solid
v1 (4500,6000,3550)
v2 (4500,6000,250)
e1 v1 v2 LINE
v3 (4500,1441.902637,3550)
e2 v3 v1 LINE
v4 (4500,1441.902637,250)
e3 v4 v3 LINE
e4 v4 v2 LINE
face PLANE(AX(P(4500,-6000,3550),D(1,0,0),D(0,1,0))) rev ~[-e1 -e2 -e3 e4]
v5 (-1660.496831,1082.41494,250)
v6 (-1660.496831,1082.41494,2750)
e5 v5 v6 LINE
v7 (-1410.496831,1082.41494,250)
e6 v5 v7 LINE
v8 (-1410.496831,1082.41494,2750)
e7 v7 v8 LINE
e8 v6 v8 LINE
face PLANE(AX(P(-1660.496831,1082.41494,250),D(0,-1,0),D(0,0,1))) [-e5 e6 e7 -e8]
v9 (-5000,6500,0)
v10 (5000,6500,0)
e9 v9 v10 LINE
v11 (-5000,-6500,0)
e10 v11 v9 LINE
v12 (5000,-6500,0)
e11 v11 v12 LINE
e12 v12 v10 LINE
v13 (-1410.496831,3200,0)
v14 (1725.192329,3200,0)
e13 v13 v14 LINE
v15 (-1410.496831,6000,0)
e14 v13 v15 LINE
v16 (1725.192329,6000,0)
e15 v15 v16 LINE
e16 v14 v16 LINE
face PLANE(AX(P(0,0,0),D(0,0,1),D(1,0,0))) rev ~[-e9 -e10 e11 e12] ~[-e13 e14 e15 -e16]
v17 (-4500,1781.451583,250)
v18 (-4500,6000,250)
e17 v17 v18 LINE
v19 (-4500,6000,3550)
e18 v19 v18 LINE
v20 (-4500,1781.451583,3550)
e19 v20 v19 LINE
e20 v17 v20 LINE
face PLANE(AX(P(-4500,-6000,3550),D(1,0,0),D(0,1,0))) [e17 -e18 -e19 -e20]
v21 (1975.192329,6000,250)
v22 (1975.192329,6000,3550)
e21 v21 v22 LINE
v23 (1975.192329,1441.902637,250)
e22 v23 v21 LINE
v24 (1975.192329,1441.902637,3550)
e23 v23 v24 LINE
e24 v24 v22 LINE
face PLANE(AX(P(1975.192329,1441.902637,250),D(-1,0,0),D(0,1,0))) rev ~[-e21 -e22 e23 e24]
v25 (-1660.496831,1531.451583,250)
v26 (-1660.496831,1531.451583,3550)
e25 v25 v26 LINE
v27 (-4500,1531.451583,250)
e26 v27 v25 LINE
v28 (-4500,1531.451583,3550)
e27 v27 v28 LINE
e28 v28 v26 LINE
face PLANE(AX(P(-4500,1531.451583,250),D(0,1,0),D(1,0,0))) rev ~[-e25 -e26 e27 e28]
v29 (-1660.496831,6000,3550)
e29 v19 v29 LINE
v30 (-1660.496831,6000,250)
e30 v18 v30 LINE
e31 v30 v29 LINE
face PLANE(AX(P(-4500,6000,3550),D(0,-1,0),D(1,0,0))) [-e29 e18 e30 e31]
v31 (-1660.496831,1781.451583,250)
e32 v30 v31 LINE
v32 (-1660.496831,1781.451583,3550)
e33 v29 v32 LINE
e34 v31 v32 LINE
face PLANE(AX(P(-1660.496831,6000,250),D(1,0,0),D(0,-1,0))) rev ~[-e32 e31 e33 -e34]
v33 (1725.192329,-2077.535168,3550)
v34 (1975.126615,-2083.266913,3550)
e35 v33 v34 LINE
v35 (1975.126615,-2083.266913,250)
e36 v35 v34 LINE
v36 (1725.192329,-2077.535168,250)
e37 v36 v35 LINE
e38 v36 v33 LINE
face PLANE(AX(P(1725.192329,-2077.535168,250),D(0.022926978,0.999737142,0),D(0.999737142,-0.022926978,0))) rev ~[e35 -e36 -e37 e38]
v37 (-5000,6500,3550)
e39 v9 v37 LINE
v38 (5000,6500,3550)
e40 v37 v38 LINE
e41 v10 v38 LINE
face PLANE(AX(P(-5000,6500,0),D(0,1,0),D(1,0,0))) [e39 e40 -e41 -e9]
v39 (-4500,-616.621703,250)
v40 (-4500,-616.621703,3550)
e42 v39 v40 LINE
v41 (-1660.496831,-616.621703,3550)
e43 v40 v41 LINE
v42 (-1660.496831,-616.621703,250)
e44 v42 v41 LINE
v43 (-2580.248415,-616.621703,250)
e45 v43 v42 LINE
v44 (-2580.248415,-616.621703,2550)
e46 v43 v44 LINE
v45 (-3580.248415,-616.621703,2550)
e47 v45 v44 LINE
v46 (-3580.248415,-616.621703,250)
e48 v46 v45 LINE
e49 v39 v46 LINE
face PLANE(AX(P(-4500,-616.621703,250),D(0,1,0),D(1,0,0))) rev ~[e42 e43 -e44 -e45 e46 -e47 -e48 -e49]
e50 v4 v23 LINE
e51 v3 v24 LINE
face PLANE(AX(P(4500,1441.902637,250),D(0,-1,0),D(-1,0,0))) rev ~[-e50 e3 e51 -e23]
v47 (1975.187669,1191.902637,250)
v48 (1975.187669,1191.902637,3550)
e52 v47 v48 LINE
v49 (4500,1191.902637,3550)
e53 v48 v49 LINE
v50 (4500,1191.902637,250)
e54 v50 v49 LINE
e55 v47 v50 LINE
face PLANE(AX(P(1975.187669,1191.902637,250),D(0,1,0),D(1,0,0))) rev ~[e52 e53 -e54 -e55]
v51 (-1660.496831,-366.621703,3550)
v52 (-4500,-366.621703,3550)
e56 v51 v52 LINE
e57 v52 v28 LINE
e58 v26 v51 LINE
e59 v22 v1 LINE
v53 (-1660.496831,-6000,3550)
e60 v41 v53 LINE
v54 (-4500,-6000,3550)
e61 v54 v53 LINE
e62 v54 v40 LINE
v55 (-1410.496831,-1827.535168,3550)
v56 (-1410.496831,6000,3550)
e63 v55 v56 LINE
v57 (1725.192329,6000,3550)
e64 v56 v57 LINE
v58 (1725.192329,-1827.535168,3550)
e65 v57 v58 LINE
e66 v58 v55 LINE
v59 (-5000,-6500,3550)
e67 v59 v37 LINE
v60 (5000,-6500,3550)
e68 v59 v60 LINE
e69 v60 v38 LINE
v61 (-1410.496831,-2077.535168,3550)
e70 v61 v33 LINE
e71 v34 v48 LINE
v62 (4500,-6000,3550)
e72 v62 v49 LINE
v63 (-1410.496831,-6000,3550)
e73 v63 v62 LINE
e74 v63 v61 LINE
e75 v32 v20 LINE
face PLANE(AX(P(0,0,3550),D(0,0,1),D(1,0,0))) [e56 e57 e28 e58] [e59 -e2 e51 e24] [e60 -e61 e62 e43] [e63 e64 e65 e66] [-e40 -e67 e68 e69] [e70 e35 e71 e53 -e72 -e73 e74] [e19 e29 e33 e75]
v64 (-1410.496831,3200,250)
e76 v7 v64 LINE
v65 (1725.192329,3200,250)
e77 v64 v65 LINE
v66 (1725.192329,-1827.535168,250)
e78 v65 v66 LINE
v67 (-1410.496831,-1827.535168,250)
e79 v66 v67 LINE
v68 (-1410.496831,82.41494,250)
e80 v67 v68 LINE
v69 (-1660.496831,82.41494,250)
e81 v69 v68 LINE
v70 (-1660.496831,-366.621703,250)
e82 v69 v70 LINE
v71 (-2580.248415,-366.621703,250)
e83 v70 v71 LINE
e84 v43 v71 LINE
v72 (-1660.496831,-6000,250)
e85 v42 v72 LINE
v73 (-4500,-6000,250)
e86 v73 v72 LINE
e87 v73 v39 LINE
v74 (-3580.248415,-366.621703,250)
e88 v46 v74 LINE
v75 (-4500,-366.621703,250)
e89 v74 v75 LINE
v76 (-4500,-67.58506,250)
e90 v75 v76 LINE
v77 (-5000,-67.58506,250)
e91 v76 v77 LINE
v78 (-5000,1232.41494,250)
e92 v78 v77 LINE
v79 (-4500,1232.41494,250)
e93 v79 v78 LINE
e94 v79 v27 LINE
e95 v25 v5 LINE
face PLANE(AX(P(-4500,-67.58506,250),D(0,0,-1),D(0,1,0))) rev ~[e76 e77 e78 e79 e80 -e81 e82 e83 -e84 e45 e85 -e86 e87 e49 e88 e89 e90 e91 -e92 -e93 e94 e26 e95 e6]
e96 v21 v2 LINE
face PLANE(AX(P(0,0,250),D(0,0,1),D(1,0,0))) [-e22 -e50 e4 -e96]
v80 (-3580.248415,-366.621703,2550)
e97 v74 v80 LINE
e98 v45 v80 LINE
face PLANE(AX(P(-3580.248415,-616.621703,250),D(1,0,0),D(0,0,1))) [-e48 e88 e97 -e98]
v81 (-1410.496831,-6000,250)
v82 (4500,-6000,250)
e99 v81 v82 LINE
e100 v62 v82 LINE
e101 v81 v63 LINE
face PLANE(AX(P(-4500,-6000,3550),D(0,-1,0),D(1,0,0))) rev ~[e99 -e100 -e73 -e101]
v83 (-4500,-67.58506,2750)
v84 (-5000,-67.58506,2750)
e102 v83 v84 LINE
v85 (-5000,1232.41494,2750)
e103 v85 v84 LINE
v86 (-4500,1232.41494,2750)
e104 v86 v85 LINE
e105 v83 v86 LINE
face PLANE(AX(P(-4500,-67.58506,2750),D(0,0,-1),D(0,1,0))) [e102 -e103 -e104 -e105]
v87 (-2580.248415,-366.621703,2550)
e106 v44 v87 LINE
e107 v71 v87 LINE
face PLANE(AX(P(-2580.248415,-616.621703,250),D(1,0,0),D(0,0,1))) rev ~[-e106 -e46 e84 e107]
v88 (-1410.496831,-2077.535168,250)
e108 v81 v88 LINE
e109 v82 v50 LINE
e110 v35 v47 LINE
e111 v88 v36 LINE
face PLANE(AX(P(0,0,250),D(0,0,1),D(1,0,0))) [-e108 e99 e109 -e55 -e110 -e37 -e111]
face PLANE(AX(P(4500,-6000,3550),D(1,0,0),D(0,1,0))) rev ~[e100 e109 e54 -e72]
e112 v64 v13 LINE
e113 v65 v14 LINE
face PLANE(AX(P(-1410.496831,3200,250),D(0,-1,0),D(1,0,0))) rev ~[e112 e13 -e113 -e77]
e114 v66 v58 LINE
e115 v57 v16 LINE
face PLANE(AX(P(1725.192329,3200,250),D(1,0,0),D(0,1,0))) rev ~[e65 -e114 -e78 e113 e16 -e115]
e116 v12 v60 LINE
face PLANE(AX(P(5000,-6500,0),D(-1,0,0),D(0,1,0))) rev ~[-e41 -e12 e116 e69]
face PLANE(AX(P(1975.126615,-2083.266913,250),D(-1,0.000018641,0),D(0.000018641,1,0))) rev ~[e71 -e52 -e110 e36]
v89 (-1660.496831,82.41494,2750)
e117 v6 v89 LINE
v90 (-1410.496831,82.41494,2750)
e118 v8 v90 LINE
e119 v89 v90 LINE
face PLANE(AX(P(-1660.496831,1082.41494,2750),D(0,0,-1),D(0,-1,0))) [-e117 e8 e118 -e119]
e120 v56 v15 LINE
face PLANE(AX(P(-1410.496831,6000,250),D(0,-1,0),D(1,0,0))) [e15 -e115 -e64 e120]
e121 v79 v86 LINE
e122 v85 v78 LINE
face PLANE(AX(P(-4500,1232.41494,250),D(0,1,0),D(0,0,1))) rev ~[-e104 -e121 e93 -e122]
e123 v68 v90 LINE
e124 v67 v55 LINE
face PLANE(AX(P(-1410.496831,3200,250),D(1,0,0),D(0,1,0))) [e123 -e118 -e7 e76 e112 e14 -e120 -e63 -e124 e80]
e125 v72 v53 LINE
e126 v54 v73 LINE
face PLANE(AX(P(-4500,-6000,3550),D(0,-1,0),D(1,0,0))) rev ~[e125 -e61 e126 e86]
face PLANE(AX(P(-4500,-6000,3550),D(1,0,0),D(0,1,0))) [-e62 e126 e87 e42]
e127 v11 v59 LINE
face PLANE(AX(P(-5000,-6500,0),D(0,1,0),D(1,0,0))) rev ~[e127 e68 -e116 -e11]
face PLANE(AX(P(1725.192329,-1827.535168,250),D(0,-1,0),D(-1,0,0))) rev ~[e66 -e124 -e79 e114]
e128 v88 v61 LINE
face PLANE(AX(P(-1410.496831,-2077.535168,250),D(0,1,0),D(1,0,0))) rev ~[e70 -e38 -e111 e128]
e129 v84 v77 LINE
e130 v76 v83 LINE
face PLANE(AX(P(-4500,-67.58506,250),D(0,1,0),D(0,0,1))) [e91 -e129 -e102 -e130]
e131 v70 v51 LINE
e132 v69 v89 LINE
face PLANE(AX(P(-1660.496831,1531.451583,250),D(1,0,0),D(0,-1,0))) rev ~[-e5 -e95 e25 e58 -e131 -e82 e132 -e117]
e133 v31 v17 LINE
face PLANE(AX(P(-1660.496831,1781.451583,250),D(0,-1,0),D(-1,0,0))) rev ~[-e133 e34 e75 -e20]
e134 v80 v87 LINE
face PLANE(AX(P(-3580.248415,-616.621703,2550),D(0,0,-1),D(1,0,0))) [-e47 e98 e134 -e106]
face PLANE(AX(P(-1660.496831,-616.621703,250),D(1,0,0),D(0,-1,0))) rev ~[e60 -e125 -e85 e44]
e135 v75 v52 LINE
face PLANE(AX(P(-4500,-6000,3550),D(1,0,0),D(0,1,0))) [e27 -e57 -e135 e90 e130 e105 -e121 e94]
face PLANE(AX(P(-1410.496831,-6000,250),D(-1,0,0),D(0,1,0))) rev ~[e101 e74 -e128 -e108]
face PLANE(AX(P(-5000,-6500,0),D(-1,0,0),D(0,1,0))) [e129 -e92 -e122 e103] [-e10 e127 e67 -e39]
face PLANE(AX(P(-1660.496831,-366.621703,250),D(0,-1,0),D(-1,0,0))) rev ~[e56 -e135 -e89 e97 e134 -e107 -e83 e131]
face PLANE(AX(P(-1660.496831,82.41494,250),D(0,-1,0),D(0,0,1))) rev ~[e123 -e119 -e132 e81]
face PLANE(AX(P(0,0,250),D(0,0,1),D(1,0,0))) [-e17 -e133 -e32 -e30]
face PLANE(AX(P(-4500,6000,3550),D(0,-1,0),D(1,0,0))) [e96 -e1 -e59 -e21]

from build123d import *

# Parameters (mm, degrees)
F0_W      = 10000
F0_H      = 13000
F1_DEPTH  = 3550
F2_W      = 9000
F2_H      = 12000
F3_DEPTH  = 3300
F5_DEPTH  = 3300
F6_W      = 1000
F6_H      = 2300
F7_DEPTH  = 250
F8_W      = 1300
F8_H      = 2500
F9_DEPTH  = 21453
F10_W     = 1000
F10_H     = 2500
F11_DEPTH = 250
F12_W     = 3135.6891602224
F12_H     = 2800
F13_DEPTH = 250


# Not quite as in the source:
# - an extrude ends at something that could not be found from the text; its depth is read off the source's solid
# - a feature names something its author has since deleted; it is built from what else it names


with BuildPart() as f1:
    # F0 (on Top) → F1 (new body)
    with BuildSketch(Plane.XY):
        Rectangle(F0_W, F0_H)
    extrude(amount=F1_DEPTH)

    # F2 (on face) → F3 (cut)
    with BuildSketch(Plane.XY.offset(3550)):
        Rectangle(F2_W, F2_H)
    extrude(amount=-F3_DEPTH, mode=Mode.SUBTRACT)

    # F4 (on face) → F5 (join)
    with BuildSketch(Plane.XY.offset(250)):
        Polygon((-1660.4968309402, -366.6217029095), (-4500, -366.6217029095), (-4500, -616.6217029095), (-1660.4968309402, -616.6217029095), (-1660.4968309402, -6000), (-1410.4968309402, -6000), (-1410.4968309402, -2077.5351682588), (1725.1923292822, -2077.5351682588), (1975.1266148544, -2083.2669128011), (1975.1876689086, 1191.9026374817), (4500, 1191.9026374817), (4500, 1441.9026374817), (1975.1923292822, 1441.9026374817), (1975.1923292822, 6000), (1725.1923292822, 6000), (1725.1923292822, 1441.9026374817), (1725.1923292822, -1827.5351682588), (-1410.4968309402, -1827.5351682588), (-1410.4968309402, 6000), (-1660.4968309402, 6000), (-1660.4968309402, 1781.4515829086), (-4500, 1781.4515829086), (-4500, 1531.4515829086), (-1660.4968309402, 1531.4515829086), align=None)
    extrude(amount=F5_DEPTH)

    # F6 (on face) → F7 (cut)
    with BuildSketch(Plane.XZ.offset(616.6217029095)):
        with Locations((-3080.2484154701, 1400)):
            Rectangle(F6_W, F6_H)
    extrude(amount=-F7_DEPTH, mode=Mode.SUBTRACT)

    # F8 (on face) → F9 (cut, through all)
    with BuildSketch(Plane.YZ.offset(-4500)):
        with Locations((582.4149399996, 1500)):
            Rectangle(F8_W, F8_H)
    extrude(amount=-F9_DEPTH, mode=Mode.SUBTRACT)

    # F10 (on face) → F11 (cut, through all)
    with BuildSketch(Plane(origin=(-1660.4968309402, 0, 0), x_dir=(0, -1, 0), z_dir=(-1, 0, 0))):
        with Locations((-582.4149399996, 1500)):
            Rectangle(F10_W, F10_H)
    extrude(amount=-F11_DEPTH, mode=Mode.SUBTRACT)

    # F12 (on face) → F13 (cut, through all)
    with BuildSketch(Plane.XY.offset(250)):
        with Locations((157.347749171, 4600)):
            Rectangle(F12_W, F12_H)
    extrude(amount=-F13_DEPTH, mode=Mode.SUBTRACT)


solid = f1.part
